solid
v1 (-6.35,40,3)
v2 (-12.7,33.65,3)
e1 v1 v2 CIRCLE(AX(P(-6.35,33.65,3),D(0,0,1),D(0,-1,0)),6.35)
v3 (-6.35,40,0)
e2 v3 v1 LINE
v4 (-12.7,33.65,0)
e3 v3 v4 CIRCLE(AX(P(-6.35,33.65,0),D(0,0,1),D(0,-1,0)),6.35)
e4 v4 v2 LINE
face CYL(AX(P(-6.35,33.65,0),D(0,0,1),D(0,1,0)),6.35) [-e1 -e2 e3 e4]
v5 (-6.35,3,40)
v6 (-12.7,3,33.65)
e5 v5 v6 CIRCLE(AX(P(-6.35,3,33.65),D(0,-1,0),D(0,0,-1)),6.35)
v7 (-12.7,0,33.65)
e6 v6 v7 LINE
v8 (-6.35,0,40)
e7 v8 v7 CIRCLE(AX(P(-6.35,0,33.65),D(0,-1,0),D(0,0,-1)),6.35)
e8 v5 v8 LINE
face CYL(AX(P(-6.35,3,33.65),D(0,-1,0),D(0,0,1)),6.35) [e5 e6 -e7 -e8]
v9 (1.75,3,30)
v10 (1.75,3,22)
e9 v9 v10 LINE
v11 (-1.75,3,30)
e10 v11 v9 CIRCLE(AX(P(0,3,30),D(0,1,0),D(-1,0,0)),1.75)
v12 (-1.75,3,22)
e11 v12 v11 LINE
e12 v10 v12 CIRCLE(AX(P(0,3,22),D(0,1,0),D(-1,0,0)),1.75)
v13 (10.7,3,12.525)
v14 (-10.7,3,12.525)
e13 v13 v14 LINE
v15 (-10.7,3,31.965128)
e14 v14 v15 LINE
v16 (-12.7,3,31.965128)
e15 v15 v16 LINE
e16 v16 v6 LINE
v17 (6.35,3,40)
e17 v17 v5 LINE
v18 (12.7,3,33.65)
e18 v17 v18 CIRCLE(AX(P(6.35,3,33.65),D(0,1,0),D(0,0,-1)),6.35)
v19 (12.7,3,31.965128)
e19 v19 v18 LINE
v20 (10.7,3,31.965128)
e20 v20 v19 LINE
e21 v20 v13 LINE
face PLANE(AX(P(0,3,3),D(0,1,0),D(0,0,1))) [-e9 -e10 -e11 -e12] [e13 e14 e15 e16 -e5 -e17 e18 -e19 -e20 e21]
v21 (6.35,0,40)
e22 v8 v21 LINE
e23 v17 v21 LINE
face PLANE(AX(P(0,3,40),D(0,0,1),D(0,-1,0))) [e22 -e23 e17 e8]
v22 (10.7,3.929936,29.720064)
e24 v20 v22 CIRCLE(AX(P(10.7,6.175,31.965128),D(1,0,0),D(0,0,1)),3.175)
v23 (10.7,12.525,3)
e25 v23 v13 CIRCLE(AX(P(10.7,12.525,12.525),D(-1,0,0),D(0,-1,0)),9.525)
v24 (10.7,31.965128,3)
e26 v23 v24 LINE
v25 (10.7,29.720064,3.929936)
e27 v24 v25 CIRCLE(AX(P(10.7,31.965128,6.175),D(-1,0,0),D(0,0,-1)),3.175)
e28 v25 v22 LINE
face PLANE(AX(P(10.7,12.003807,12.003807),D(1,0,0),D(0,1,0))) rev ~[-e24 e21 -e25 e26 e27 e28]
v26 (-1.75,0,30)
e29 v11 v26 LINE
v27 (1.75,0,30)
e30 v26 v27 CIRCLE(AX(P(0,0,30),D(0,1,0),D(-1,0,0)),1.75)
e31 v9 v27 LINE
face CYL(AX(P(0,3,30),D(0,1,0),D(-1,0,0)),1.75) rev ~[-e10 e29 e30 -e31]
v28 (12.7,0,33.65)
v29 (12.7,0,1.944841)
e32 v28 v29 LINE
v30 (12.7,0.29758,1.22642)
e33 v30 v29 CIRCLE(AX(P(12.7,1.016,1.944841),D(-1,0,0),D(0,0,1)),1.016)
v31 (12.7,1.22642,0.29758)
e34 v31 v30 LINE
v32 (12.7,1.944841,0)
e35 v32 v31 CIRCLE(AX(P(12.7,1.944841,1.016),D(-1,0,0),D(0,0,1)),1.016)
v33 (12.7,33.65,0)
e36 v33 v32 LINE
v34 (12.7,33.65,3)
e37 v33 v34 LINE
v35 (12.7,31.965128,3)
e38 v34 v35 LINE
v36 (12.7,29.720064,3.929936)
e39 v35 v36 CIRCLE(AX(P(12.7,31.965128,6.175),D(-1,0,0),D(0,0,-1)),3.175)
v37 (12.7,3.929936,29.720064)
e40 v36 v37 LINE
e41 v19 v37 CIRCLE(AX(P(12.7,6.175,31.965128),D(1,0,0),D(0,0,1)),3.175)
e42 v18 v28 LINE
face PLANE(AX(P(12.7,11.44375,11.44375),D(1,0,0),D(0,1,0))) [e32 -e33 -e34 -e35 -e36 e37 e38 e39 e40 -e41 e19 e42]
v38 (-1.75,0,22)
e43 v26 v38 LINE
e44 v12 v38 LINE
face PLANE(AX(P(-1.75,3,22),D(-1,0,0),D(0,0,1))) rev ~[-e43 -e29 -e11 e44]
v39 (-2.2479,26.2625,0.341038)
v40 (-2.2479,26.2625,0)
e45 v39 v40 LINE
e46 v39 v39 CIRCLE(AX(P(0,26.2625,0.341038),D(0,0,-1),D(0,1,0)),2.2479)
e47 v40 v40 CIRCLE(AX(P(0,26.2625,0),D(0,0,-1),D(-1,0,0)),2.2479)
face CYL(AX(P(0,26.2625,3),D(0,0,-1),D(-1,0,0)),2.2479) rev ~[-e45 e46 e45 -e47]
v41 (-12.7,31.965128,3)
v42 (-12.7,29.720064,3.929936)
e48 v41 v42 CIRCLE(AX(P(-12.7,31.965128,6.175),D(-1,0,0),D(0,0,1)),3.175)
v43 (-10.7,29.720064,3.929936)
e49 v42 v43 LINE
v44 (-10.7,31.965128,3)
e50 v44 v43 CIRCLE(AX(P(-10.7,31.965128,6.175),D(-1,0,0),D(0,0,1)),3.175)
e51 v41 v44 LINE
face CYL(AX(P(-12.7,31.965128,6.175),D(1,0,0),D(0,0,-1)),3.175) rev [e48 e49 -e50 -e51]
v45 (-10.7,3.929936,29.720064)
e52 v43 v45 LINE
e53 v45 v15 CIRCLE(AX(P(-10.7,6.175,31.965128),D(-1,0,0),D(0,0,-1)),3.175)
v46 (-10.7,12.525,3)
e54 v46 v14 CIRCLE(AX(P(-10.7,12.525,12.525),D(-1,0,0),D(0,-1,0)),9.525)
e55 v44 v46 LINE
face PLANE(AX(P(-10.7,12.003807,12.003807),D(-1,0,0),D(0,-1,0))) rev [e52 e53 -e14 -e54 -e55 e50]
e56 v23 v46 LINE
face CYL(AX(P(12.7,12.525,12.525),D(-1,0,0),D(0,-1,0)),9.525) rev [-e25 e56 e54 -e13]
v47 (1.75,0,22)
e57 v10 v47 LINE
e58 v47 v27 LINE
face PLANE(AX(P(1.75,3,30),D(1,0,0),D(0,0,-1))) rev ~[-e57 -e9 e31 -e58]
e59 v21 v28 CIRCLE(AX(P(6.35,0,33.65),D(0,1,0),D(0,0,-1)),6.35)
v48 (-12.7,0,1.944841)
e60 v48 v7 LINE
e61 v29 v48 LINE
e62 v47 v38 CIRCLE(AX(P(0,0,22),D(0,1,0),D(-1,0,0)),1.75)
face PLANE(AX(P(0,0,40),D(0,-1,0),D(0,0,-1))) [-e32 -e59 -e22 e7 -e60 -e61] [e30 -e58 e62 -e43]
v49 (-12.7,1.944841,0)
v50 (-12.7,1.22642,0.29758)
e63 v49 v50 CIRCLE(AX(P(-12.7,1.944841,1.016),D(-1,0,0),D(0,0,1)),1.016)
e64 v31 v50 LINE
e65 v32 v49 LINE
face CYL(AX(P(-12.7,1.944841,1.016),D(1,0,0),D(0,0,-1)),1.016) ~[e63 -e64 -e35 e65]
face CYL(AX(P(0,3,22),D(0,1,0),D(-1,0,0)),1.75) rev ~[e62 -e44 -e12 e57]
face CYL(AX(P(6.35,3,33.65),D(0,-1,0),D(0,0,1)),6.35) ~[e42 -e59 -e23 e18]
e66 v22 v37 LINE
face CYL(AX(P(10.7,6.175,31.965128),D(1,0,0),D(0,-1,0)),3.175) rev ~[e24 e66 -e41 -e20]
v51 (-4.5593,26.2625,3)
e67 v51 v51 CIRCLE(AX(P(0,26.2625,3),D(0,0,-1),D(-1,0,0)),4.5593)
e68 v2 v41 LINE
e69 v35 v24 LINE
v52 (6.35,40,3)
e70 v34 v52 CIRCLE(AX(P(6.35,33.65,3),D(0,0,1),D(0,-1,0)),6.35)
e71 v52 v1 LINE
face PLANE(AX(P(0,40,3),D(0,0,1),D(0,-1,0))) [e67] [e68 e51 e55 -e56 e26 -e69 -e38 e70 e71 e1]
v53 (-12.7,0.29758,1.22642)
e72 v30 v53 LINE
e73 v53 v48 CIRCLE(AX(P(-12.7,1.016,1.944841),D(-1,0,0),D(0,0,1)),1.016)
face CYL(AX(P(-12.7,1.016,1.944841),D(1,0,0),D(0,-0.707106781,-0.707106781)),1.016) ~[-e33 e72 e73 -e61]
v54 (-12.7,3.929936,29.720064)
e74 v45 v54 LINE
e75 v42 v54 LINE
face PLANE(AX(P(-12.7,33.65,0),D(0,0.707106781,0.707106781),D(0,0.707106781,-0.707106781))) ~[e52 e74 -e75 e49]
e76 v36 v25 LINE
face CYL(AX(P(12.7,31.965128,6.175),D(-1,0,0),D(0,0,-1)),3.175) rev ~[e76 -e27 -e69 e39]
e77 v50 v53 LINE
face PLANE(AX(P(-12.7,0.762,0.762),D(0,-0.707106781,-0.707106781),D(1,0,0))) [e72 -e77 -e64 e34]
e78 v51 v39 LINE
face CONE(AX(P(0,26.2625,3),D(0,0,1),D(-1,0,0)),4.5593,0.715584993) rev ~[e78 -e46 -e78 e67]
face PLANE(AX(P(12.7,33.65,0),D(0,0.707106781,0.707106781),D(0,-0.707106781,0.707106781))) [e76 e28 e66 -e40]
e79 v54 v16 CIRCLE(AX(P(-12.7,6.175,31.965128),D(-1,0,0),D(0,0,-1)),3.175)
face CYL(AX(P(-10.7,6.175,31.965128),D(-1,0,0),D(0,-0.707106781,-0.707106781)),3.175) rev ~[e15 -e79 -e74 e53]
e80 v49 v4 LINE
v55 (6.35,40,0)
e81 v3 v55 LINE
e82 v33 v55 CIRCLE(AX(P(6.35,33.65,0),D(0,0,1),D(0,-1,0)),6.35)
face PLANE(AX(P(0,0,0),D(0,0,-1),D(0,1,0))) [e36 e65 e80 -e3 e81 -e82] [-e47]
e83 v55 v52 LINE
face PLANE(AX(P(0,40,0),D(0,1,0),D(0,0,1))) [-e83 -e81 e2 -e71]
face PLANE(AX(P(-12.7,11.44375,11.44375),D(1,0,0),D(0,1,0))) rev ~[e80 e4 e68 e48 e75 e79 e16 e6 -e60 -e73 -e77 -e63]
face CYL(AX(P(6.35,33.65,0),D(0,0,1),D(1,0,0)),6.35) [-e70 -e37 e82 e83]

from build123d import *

# Parameters (mm, degrees)
F1_DEPTH        = 12.7
F2_R            = 9.525
F3_SIZE         = 1.524
F4_R            = 1.016
F6_DEPTH        = 2
F7_R            = 6.35
F8_R            = 3.175
F10_DEPTH       = 3.001
F12_D           = 4.4958
F12_DEPTH       = 25.4
F12_CSINK_D     = 9.1186
F12_CSINK_ANGLE = 82
F12_TIP         = 1.3506745855


# Not quite as in the source:
# - a pattern or mirror of a feature is missing from the dataset's text; its kind, count and spacing are read off the source's solid


with BuildPart() as f1:
    # F0 (on Right) → F1 (new body, symmetric)
    with BuildSketch(Plane.YZ):
        Polygon((3, 40), (0, 40), (0, 0), (40, 0), (40, 3), (3, 3), align=None)
    extrude(amount=F1_DEPTH, both=True)

    # F2
    f2_edges = [f1.edges().sort_by_distance(p)[0] for p in [
        (0, 3, 3),
    ]]
    fillet(f2_edges, radius=F2_R)

    # F3
    f3_edges = [f1.edges().sort_by_distance(p)[0] for p in [
        (0, 0, 0),
    ]]
    chamfer(f3_edges, length=F3_SIZE)

    # F4
    f4_edges = [f1.edges().sort_by_distance(p)[0] for p in [
        (0, 0, 1.524),
        (0, 1.524, 0),
    ]]
    fillet(f4_edges, radius=F4_R)

    # F5 (on face) → F6 (join)
    with BuildSketch(Plane.YZ.offset(12.7)):
        with BuildLine():
            Line((33.65, 0), (0, 33.65))
            Line((0, 33.65), (0, 1.9448409794))
            ThreePointArc((0, 1.9448409794), (0.077338395, 1.5560346121), (0.2975795103, 1.2264204897))
            Line((0.2975795103, 1.2264204897), (1.2264204897, 0.2975795103))
            ThreePointArc((1.2264204897, 0.2975795103), (1.5560346121, 0.077338395), (1.9448409794, 0))
            Line((1.9448409794, 0), (33.65, 0))
        make_face()
    f6 = extrude(amount=-F6_DEPTH)

    # F6_copies: F6 across plane
    add(f6.mirror(Plane(origin=(0, 0, 0), x_dir=(0, 0, -1), z_dir=(-1, 0, 0))))

    # F7
    f7_edges = [f1.edges().sort_by_distance(p)[0] for p in [
        (12.7, 1.5, 40),
        (-12.7, 1.5, 40),
        (-12.7, 40, 1.5),
        (12.7, 40, 1.5),
    ]]
    fillet(f7_edges, radius=F7_R)

    # F8
    f8_edges = [f1.edges().sort_by_distance(p)[0] for p in [
        (11.7, 3, 30.65),
        (11.7, 30.65, 3),
        (-11.7, 30.65, 3),
        (-11.7, 3, 30.65),
    ]]
    fillet(f8_edges, radius=F8_R)

    # F9 (on face) → F10 (cut, through all)
    with BuildSketch(Plane(origin=(0, 3, 0), x_dir=(-1, 0, 0), z_dir=(0, 1, 0))):
        with BuildLine():
            Line((1.75, 22), (1.75, 30))
            ThreePointArc((1.75, 30), (0, 28.25), (-1.75, 30))
            Line((-1.75, 30), (-1.75, 22))
            ThreePointArc((-1.75, 22), (0, 23.75), (1.75, 22))
        make_face()
        with BuildLine():
            ThreePointArc((-1.75, 30), (0, 28.25), (1.75, 30))
            ThreePointArc((1.75, 30), (0, 31.75), (-1.75, 30))
        make_face()
        with BuildLine():
            ThreePointArc((-1.75, 22), (0, 20.25), (1.75, 22))
            ThreePointArc((1.75, 22), (0, 23.75), (-1.75, 22))
        make_face()
    extrude(amount=-F10_DEPTH, mode=Mode.SUBTRACT)

    # F12
    with Locations(Plane.XY.offset(3)):
        with Locations((0, 26.2625)):
            CounterSinkHole(F12_D / 2, F12_CSINK_D / 2, depth=F12_DEPTH, counter_sink_angle=F12_CSINK_ANGLE)
            with Locations((0, 0, -(F12_DEPTH + F12_TIP / 2))):  # 118° drill point
                Cone(0, F12_D / 2, F12_TIP, mode=Mode.SUBTRACT)


solid = f1.part
